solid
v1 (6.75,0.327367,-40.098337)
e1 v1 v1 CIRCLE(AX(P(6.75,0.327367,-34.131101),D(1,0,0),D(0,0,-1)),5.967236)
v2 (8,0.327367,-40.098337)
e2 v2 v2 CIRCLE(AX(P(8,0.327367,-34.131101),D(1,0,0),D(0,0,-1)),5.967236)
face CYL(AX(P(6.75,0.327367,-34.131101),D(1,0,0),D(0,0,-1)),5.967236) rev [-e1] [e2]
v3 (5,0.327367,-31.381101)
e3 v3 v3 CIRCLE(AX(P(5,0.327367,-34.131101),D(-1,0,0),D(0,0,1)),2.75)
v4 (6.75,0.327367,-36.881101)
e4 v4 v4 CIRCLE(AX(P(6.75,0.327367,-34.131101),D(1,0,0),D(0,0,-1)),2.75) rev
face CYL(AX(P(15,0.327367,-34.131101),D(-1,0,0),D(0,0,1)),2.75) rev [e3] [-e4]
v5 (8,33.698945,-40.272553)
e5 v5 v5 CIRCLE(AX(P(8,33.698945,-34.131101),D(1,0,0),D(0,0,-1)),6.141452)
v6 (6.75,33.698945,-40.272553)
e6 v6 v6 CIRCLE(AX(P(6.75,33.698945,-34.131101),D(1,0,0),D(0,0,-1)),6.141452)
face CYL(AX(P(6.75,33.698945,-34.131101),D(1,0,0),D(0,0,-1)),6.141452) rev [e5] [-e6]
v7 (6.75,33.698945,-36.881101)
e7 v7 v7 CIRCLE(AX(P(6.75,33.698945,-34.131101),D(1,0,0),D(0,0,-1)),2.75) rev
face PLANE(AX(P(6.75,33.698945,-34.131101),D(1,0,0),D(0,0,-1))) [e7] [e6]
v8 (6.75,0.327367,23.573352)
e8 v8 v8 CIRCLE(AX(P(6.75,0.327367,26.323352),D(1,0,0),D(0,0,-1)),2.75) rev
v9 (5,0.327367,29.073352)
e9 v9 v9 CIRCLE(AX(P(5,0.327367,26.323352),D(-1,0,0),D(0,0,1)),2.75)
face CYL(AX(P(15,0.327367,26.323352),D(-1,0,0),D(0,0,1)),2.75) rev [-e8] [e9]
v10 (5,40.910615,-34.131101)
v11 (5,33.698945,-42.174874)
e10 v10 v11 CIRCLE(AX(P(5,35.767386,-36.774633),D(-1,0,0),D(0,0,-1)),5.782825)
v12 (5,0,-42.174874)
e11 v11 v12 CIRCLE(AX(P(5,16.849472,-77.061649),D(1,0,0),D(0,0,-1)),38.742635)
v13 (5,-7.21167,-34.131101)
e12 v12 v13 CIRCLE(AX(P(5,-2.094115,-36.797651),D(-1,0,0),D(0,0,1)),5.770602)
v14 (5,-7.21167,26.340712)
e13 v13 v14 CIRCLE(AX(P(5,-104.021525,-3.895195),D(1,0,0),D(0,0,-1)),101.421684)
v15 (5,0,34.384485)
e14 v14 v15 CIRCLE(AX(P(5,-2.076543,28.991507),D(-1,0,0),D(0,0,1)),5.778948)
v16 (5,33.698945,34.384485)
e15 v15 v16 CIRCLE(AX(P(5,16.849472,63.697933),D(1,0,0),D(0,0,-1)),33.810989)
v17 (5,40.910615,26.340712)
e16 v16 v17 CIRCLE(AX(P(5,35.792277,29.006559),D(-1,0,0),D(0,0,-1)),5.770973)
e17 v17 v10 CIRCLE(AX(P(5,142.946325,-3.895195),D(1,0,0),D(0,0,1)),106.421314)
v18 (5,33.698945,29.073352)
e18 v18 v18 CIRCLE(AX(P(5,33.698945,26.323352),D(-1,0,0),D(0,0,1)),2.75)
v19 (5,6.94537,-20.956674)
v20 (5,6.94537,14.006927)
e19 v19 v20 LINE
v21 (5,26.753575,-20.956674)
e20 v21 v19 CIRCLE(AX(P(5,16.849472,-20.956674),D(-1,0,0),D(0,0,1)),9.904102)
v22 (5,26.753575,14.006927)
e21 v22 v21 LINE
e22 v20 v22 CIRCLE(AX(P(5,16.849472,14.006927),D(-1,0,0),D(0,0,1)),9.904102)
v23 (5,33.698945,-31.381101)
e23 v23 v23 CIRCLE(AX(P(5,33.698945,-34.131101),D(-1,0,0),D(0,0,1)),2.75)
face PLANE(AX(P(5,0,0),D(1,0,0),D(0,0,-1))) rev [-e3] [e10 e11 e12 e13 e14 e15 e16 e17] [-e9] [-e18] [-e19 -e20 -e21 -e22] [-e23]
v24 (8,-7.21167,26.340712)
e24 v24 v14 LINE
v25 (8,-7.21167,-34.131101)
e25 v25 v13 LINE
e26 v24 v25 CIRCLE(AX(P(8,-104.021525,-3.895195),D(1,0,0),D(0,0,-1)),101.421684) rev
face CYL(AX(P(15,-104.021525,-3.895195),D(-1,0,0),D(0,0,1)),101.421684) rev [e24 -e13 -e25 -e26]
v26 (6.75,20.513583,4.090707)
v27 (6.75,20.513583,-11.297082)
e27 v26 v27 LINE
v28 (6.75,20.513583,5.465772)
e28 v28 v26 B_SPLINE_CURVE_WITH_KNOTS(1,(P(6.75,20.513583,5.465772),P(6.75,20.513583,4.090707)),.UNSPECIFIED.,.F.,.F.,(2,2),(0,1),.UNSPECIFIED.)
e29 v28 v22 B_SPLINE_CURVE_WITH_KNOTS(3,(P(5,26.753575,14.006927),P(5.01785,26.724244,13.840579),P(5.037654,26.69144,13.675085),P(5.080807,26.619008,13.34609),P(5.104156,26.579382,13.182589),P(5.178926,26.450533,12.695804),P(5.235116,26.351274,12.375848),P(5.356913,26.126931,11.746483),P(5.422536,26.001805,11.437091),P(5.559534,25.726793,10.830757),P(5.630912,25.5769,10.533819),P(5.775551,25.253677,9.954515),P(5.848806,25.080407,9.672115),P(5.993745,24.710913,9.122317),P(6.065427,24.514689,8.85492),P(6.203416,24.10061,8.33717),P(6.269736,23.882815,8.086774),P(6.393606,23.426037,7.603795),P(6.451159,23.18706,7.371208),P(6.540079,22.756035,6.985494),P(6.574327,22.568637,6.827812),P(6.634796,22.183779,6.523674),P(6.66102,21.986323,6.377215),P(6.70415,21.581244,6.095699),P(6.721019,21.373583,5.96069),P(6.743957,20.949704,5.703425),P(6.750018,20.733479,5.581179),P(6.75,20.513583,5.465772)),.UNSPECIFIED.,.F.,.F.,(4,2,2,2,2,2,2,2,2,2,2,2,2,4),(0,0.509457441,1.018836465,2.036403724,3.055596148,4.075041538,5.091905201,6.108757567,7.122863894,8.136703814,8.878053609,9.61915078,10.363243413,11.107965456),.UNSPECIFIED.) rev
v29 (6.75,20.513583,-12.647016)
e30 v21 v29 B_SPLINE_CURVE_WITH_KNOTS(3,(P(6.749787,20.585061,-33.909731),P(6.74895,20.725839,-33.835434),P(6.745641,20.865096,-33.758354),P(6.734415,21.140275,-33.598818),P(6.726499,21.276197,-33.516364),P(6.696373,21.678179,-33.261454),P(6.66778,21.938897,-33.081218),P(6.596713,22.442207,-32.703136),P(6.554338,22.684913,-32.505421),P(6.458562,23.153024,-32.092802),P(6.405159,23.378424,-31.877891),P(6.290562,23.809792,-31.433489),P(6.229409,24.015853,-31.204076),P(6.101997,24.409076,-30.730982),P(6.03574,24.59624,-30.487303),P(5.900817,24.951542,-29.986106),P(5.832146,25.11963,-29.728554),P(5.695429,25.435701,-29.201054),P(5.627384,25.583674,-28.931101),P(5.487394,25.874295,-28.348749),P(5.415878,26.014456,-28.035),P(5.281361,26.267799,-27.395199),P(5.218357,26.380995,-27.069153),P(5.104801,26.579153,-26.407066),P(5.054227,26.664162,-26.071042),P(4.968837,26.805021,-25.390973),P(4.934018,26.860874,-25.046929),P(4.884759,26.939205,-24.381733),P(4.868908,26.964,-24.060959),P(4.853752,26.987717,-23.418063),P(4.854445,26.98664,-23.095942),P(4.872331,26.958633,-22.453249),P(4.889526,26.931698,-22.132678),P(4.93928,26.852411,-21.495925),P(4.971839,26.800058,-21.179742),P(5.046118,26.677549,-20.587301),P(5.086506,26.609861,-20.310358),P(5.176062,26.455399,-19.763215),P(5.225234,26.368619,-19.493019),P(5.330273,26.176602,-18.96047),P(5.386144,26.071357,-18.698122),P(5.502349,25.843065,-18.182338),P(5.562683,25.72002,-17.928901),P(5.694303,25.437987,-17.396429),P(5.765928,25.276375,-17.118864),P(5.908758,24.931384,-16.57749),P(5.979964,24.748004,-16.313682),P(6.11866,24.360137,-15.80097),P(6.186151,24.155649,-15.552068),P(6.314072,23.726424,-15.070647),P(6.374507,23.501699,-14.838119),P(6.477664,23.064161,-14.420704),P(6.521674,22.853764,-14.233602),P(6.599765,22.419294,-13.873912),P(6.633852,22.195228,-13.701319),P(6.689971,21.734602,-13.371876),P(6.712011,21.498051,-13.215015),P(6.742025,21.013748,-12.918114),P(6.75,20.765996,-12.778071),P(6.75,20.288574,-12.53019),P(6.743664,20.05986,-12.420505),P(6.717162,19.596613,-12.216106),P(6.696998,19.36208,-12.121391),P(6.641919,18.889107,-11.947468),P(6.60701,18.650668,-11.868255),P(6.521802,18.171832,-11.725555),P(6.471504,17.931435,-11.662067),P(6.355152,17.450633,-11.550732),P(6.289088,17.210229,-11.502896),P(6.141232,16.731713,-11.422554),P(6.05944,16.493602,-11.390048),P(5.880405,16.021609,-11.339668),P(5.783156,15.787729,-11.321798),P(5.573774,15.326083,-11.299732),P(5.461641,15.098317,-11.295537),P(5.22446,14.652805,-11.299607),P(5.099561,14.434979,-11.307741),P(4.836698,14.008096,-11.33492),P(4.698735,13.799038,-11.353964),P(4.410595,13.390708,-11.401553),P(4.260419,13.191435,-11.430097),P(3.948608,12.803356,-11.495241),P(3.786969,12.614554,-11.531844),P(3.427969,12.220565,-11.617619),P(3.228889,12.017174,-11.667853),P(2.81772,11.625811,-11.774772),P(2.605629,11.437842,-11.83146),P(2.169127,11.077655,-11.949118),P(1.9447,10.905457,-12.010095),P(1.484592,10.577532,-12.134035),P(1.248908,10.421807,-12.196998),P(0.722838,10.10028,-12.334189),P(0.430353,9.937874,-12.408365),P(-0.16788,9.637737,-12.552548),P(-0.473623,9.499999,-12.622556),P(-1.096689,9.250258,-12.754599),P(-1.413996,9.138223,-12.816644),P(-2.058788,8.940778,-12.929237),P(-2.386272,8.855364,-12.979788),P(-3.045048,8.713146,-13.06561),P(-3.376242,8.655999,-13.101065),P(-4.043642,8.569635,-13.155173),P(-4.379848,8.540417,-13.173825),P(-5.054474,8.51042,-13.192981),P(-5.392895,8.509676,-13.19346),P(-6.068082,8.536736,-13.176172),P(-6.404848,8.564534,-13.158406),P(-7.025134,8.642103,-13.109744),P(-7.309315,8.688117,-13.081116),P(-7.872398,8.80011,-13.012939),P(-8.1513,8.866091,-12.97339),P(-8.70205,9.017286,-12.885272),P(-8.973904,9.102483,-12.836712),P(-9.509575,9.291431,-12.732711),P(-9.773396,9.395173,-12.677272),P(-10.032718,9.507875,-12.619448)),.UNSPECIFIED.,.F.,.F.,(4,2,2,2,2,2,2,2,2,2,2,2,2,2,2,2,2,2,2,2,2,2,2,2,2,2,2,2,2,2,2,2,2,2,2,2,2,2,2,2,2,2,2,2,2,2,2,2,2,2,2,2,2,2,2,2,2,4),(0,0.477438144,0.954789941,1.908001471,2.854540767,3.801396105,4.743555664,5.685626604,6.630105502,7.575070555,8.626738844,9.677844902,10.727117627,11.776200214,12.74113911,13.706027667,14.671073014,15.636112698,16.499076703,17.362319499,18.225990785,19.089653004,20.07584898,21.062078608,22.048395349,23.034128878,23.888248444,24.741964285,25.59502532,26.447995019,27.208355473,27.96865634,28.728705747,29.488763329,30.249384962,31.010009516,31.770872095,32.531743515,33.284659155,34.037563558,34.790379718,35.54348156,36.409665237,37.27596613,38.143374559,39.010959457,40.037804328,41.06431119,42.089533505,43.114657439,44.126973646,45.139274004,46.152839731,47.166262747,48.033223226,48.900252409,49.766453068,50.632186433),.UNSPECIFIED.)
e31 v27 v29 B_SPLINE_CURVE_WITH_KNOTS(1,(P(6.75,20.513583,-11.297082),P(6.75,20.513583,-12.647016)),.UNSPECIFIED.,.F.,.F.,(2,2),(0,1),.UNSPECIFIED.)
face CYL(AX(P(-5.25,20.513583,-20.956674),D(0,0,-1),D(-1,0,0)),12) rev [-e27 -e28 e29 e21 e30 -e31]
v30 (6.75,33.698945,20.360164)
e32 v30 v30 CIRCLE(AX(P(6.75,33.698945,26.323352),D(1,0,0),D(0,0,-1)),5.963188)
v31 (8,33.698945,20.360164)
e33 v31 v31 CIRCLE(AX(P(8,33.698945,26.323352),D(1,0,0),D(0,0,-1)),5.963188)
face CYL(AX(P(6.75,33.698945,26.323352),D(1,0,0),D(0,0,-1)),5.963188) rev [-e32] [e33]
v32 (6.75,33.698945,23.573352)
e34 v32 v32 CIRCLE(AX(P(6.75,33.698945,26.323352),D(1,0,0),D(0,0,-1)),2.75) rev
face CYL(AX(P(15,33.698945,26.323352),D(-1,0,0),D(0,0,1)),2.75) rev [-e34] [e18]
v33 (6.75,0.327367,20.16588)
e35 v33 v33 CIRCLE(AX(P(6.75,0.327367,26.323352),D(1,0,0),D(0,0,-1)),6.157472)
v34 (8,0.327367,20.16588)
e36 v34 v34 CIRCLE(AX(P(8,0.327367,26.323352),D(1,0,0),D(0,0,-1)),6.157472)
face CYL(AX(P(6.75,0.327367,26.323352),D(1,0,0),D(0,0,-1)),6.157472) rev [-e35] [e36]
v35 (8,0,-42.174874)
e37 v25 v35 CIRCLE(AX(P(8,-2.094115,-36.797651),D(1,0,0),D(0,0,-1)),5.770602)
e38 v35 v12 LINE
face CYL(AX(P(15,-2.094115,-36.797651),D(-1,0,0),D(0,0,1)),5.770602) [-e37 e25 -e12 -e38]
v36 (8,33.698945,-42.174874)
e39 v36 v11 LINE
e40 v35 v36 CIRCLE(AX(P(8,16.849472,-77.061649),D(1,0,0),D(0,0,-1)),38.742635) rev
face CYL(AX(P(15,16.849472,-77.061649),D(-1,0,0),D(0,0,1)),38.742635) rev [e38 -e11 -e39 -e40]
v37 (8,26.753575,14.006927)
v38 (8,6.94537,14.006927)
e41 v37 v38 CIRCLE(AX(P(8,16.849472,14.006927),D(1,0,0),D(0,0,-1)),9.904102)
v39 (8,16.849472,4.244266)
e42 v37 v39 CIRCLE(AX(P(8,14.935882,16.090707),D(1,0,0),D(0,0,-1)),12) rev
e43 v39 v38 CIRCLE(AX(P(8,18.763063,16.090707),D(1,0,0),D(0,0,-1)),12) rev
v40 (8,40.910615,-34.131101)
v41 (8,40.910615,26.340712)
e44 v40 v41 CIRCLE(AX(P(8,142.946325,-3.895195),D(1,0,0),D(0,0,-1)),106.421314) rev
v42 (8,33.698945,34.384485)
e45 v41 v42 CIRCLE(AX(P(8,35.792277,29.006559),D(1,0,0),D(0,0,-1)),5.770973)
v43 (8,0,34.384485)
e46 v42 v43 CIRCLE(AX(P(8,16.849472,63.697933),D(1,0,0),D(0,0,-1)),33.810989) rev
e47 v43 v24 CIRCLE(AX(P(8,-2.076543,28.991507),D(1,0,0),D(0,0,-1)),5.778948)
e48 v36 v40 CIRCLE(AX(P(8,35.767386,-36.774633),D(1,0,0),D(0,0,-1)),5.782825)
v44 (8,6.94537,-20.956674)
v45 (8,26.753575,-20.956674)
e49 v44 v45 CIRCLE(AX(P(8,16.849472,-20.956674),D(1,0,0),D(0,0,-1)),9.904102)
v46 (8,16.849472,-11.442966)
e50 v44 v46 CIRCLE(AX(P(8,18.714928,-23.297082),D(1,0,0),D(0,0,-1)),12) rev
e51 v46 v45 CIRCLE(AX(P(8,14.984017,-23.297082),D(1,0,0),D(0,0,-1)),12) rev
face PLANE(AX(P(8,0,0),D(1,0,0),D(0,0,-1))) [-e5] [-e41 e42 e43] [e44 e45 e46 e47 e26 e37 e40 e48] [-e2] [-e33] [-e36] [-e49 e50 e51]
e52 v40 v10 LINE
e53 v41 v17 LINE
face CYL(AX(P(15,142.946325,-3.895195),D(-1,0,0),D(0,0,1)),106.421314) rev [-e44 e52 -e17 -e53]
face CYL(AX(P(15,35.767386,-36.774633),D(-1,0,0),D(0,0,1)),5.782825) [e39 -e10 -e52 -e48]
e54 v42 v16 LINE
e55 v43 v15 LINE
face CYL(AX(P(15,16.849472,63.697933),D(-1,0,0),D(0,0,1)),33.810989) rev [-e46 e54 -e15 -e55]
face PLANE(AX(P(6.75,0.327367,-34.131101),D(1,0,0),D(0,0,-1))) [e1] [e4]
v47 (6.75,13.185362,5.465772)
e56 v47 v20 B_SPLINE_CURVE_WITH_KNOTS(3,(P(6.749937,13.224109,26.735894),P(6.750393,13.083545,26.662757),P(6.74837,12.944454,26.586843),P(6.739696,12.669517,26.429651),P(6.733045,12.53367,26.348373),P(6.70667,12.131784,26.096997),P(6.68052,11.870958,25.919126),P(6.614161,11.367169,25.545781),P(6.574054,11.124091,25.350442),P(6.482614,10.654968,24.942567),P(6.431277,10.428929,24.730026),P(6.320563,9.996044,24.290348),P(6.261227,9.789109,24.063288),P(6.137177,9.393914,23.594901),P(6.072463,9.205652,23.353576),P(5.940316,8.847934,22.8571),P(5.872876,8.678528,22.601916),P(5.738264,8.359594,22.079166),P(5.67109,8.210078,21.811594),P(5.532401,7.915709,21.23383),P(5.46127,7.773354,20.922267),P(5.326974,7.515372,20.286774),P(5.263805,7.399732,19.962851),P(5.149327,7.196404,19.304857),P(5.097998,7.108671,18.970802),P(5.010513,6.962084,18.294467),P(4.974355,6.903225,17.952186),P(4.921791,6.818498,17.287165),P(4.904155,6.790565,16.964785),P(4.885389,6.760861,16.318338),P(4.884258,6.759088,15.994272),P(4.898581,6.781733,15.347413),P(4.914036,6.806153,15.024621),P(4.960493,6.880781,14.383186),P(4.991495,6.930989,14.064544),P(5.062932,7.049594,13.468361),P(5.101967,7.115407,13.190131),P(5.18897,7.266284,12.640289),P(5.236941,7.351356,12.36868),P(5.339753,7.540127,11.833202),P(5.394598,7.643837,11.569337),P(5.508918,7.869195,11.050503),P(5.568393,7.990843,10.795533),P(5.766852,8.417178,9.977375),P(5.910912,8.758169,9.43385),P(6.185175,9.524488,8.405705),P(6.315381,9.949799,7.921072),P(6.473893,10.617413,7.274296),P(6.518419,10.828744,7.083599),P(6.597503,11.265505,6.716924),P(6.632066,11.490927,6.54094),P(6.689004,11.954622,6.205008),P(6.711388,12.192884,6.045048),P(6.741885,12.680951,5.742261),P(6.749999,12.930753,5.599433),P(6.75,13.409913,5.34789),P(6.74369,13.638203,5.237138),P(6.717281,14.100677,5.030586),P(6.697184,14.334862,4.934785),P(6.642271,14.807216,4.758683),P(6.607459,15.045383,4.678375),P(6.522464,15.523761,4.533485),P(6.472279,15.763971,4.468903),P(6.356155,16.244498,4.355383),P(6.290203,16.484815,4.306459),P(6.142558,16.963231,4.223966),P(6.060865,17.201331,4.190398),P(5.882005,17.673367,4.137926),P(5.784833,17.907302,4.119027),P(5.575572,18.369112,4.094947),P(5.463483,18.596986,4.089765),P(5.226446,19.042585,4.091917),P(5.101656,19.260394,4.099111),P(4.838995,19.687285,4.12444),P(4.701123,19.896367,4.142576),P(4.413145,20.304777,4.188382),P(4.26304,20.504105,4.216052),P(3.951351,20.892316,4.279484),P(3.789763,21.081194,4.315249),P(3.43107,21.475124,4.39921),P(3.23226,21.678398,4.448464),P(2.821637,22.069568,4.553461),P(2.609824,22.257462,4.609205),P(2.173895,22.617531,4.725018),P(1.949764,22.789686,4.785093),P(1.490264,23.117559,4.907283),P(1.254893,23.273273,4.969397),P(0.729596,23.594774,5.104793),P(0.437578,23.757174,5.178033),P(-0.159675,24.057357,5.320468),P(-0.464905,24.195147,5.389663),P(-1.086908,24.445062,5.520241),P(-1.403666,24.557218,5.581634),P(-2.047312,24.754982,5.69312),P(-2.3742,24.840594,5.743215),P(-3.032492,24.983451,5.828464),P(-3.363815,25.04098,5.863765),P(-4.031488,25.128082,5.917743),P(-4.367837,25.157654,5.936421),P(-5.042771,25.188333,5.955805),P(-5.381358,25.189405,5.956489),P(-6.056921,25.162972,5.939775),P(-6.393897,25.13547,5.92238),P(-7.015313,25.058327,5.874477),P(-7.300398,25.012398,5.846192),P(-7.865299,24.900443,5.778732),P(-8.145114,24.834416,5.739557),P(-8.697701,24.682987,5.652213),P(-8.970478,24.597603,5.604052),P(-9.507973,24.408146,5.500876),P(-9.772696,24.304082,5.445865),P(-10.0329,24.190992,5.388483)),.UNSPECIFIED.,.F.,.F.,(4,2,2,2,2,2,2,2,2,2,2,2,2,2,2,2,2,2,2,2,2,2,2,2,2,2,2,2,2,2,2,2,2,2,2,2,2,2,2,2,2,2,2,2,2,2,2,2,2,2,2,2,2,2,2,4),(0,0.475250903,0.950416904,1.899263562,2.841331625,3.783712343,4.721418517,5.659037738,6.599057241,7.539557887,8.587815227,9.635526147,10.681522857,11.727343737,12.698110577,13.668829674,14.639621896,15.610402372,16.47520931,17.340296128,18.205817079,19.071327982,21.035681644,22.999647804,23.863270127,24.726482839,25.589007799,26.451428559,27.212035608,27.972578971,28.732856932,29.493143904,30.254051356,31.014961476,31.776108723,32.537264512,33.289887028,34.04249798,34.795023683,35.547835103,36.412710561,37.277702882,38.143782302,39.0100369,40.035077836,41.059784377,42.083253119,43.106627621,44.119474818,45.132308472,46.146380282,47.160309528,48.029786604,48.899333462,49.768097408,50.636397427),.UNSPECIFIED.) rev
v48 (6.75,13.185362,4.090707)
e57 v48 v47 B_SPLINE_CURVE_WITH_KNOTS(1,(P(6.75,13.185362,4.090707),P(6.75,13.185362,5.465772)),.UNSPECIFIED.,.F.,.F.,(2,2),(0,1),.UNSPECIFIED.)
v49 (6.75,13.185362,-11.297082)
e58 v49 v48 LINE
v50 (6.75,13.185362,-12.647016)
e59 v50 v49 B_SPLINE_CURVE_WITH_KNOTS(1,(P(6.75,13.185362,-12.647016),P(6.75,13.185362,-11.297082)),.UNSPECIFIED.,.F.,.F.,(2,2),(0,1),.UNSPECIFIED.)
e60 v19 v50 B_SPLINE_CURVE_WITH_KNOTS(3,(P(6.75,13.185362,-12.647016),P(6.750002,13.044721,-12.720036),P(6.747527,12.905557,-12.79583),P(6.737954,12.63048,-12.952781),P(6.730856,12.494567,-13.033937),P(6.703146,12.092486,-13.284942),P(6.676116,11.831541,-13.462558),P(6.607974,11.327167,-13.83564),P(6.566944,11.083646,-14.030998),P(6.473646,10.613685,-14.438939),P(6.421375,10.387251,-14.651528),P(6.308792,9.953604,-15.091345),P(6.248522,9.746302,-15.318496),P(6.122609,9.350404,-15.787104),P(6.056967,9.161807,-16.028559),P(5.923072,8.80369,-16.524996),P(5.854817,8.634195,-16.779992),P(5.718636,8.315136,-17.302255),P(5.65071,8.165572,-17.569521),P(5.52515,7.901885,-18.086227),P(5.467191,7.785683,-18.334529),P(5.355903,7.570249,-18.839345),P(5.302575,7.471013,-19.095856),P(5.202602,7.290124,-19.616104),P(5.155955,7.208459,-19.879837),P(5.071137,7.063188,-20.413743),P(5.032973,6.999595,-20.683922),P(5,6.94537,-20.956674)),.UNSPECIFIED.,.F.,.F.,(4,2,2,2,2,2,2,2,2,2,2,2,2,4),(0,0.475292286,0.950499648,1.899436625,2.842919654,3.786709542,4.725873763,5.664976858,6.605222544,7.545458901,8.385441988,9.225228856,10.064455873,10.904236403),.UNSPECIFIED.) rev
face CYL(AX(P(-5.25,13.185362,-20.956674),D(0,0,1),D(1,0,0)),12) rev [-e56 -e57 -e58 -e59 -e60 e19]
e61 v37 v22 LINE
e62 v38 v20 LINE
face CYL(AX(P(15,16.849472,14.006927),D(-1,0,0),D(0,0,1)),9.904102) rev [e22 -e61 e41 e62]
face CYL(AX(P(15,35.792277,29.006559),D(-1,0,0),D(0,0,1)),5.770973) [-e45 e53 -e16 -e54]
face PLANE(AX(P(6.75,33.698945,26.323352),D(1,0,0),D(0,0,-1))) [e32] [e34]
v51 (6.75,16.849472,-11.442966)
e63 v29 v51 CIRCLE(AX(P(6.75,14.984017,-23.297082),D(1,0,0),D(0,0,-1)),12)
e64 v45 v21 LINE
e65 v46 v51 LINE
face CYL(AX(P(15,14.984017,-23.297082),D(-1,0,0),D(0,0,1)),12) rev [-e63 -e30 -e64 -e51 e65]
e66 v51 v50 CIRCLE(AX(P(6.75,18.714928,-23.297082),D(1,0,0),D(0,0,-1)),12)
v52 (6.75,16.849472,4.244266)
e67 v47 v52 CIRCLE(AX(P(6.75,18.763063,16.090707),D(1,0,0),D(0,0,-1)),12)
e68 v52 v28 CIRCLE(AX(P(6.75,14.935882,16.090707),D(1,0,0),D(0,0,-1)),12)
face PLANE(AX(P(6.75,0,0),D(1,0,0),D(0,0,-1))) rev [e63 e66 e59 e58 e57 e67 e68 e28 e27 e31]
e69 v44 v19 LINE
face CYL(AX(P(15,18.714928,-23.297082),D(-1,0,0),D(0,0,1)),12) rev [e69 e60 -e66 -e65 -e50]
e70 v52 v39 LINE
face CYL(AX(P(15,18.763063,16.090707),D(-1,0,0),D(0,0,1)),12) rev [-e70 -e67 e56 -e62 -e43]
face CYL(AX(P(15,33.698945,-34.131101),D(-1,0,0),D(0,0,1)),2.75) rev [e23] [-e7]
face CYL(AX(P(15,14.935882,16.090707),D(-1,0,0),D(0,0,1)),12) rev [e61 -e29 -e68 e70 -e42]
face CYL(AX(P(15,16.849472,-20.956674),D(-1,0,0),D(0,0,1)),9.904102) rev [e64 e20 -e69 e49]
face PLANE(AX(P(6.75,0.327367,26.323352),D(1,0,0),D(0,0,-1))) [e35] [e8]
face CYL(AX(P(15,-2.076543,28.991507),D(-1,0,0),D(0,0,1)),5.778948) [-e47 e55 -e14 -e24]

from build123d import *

# Parameters (mm, degrees)
SKETCH_1_W          = 87
SKETCH_1_H          = 63
SKETCH_1_W_2        = 83
SKETCH_1_H_2        = 59
EXTRUDE_1_DEPTH     = 5
SKETCH_2_W          = 87
SKETCH_2_H          = 63
EXTRUDE_2_DEPTH     = 3
SKETCH_3_W          = 2.764626384
SKETCH_3_H          = 4.6515936
CUT_EXTRUDE_1_DEPTH = 2
FILLET_1_R          = 2
SKETCH_5_R          = 2.75
CUT_EXTRUDE_2_DEPTH = 10
SKETCH_6_OUTSIDE_W  = 110.542
SKETCH_6_OUTSIDE_H  = 86.542
CUT_EXTRUDE_3_DEPTH = 10
SKETCH_7_W          = 10.763963746
SKETCH_7_H          = 73.165580881
CUT_EXTRUDE_4_DEPTH = 125
SKETCH_8_R          = 5.963187944
SKETCH_8_R_2        = 6.141451549
SKETCH_8_R_3        = 6.157472201
SKETCH_8_R_4        = 5.967235868
CUT_EXTRUDE_5_DEPTH = 1.25
SKETCH_9_W          = 15.387789175
SKETCH_9_H          = 31.944271198
EXTRUDE_4_DEPTH     = 1.25
FILLET_2_R          = 12


with BuildPart() as part:
    # 草图1 → 凸台-拉伸1 (new body)
    with BuildSketch(Plane(origin=(0, 0, 0), x_dir=(0, 0, -1), z_dir=(1, 0, 0))):
        with Locations((3.90387463, 17.013155975)):
            Rectangle(SKETCH_1_W, SKETCH_1_H)
        with Locations((3.90387463, 17.013155975)):
            Rectangle(SKETCH_1_W_2, SKETCH_1_H_2, mode=Mode.SUBTRACT)
    extrude(amount=EXTRUDE_1_DEPTH)

    # 草图2 → 凸台-拉伸2 (add)
    with BuildSketch(Plane(origin=(5, 0, 0), x_dir=(0, 0, -1), z_dir=(1, 0, 0))):
        with Locations((3.90387463, 17.013155975)):
            Rectangle(SKETCH_2_W, SKETCH_2_H)
    extrude(amount=EXTRUDE_2_DEPTH)

    # 草图3 → 切除-拉伸1 (cut)
    with BuildSketch(Plane(origin=(0, 0, -47.40387463), x_dir=(-1, 0, 0), z_dir=(0, 0, -1))):
        with Locations((-3.662779601, -6.806448474)):
            Rectangle(SKETCH_3_W, SKETCH_3_H)
    extrude(amount=-CUT_EXTRUDE_1_DEPTH, mode=Mode.SUBTRACT)

    # 圆角1
    fillet_1_edges = [part.edges().sort_by_distance(p)[0] for p in [
        (8, 17.013155975, 39.59612537),
        (8, -14.486844025, -3.90387463),
        (8, 17.013155975, -47.40387463),
        (8, 48.513155975, -3.90387463),
        (4, 48.513155975, 39.59612537),
        (4, 48.513155975, -47.40387463),
        (4, -14.486844025, -47.40387463),
        (4, -14.486844025, 39.59612537),
    ]]
    fillet(fillet_1_edges, radius=FILLET_1_R)

    # 草图5 → 切除-拉伸2 (cut)
    with BuildSketch(Plane.ZY.offset(-5)):
        with Locations((-34.13110136, 33.698944985)):
            Circle(SKETCH_5_R)
        with Locations((26.3233521, 33.698944985)):
            Circle(SKETCH_5_R)
        with Locations((-34.13110136, 0.327366965)):
            Circle(SKETCH_5_R)
        with Locations((26.3233521, 0.327366965)):
            Circle(SKETCH_5_R)
    extrude(amount=-CUT_EXTRUDE_2_DEPTH, mode=Mode.SUBTRACT)

    # 草图6 outside → 切除-拉伸3 (cut)
    # profile 1 of 2: a face of its own
    with BuildSketch(Plane.ZY.offset(-5)):
        with Locations((-3.904, 17.013)):
            Rectangle(SKETCH_6_OUTSIDE_W, SKETCH_6_OUTSIDE_H)
        with BuildLine():
            ThreePointArc((-42.174874453, 33.698944985), (-38.319014018, 16.849472493), (-42.174874453, 0))
            ThreePointArc((-42.174874453, 0), (-40.649791206, -6.390726624), (-34.13110136, -7.211670209))
            ThreePointArc((-34.13110136, -7.211670209), (-3.895194581, -2.599840712), (26.340712199, -7.211670209))
            ThreePointArc((26.340712199, -7.211670209), (32.84921876, -6.379368362), (34.384485291, 0))
            ThreePointArc((34.384485291, 0), (29.88694456, 16.849472493), (34.384485291, 33.698944985))
            ThreePointArc((34.384485291, 33.698944985), (32.858946784, 40.089163818), (26.340712199, 40.910615194))
            ThreePointArc((26.340712199, 40.910615194), (-3.895194581, 36.525010702), (-34.13110136, 40.910615194))
            ThreePointArc((-34.13110136, 40.910615194), (-40.634931957, 40.073097857), (-42.174874453, 33.698944985))
        make_face(mode=Mode.SUBTRACT)
    # profile 2 of 2: a face of its own
    with BuildSketch(Plane.ZY.offset(-5)):
        with BuildLine():
            Line((-20.956673586, 26.753574551), (14.00692679, 26.753574551))
            ThreePointArc((14.00692679, 26.753574551), (23.911028849, 16.849472493), (14.00692679, 6.945370434))
            Line((14.00692679, 6.945370434), (-20.956673586, 6.945370434))
            ThreePointArc((-20.956673586, 6.945370434), (-30.860775645, 16.849472493), (-20.956673586, 26.753574551))
        make_face()
    extrude(amount=-CUT_EXTRUDE_3_DEPTH, mode=Mode.SUBTRACT)


with BuildPart() as cut_extrude_3_piece_1:
    # of the separate pieces the step leaves, piece 1, a body of its own (cut_extrude_3_pieces)
    add(part.part.solids().sort_by_distance((5, 33.698944985, 34.384485291))[0])

    # 草图8 → 切除-拉伸5 (cut)
    with BuildSketch(Plane(origin=(8, 0, 0), x_dir=(0, 0, -1), z_dir=(1, 0, 0))):
        with Locations((-26.3233521, 33.698944985)):
            Circle(SKETCH_8_R)
        with Locations((34.13110136, 33.698944985)):
            Circle(SKETCH_8_R_2)
        with Locations((-26.3233521, 0.327366965)):
            Circle(SKETCH_8_R_3)
        with Locations((34.13110136, 0.327366965)):
            Circle(SKETCH_8_R_4)
    extrude(amount=-CUT_EXTRUDE_5_DEPTH, mode=Mode.SUBTRACT)

    # 草图9 → 凸台-拉伸4 (add)
    with BuildSketch(Plane(origin=(8, 0, 0), x_dir=(0, 0, -1), z_dir=(1, 0, 0))):
        with Locations((3.60318744, 17.051189704)):
            Rectangle(SKETCH_9_W, SKETCH_9_H)
    extrude(amount=-EXTRUDE_4_DEPTH)

    # 圆角2
    # the kernel refuses this fillet: 12 mm, written as the material it adds along each edge
    with BuildSketch(Plane(origin=(6.75, 26.753574551, 4.090707148), x_dir=(-1, 0, 0), z_dir=(0, 0, -1)), Plane(origin=(6.75, 6.945370434, -11.297082027), x_dir=(-1, 0, 0), z_dir=(0, 0, 1))) as fillet_2_piece_1:
        with BuildLine():
            CenterArc((12, -6.239991987), FILLET_2_R, 148.667793293, 31.332206707)
            Line((0, -6.239991987), (-0.24, -6.239991987))
            Line((-0.24, -6.239991987), (-0.24, 0))
            Line((-0.24, 0), (0, 0.24))
            ThreePointArc((0, 0.24), (0.875, 0.24), (1.545, 0.12479984))
            Line((1.545, 0.12479984), (1.75, 0))
        make_face()
    extrude(amount=15.387789175)
    with BuildSketch(Plane(origin=(6.75, 6.945370434, -11.297082027), x_dir=(0, 0, -1), z_dir=(1, 0, 0)), Plane(origin=(8, 26.753574551, -11.297082027), x_dir=(0, 0, -1), z_dir=(-1, 0, 0))) as fillet_2_piece_2:
        with BuildLine():
            CenterArc((12, 11.769557695), FILLET_2_R, 180, 78.753288074)
            Line((0, 11.769557695), (-0.24, 11.769557695))
            Line((-0.24, 11.769557695), (-0.24, 0))
            Line((-0.24, 0), (0, -0.24))
            ThreePointArc((0, -0.24), (4.82979578, -0.24), (9.612783391, -0.235391154))
            Line((9.612783391, -0.235391154), (9.65959156, 0))
        make_face()
    extrude(amount=1.25)
    with BuildSketch(Plane(origin=(8, 6.945370434, 4.090707148), x_dir=(0, 0, 1), z_dir=(-1, 0, 0)), Plane(origin=(6.75, 26.753574551, 4.090707148), x_dir=(0, 0, 1), z_dir=(1, 0, 0))) as fillet_2_piece_3:
        with BuildLine():
            CenterArc((12, 11.817692644), FILLET_2_R, 180, 79.999989207)
            Line((0, 11.817692644), (-0.24, 11.817692644))
            Line((-0.24, 11.817692644), (-0.24, 0))
            Line((-0.24, 0), (0, -0.24))
            ThreePointArc((0, -0.24), (4.958109821, -0.24), (9.874544035, -0.236353853))
            Line((9.874544035, -0.236353853), (9.916219642, 0))
        make_face()
    extrude(amount=1.25)
    with BuildSketch(Plane(origin=(-22.794231609, 26.753574551, 4.090707148), x_dir=(0, 0, 1), z_dir=(1, 0, 0))) as fillet_2_piece_4a_section:
        with BuildLine():
            CenterArc((12, 11.817692644), FILLET_2_R, 180, 79.999989207)
            Line((0, 11.817692644), (-0.24, 11.817692644))
            Line((-0.24, 11.817692644), (-0.24, 0))
            Line((-0.24, 0), (0, -0.24))
            ThreePointArc((0, -0.24), (4.958109821, -0.24), (9.874544035, -0.236353853))
            Line((9.874544035, -0.236353853), (9.916219642, 0))
        make_face()
    fillet_2_piece_4a = extrude(amount=30.794231609, mode=Mode.PRIVATE)
    fillet_2_piece_4a = split(fillet_2_piece_4a, bisect_by=Plane(origin=(5, 26.753574551, 4.090707148), z_dir=(1, 0, 0)), keep=Keep.TOP, mode=Mode.PRIVATE)
    fillet_2_piece_4a = split(fillet_2_piece_4a, bisect_by=Plane(origin=(6.75, 26.753574551, 4.090707148), z_dir=(-1, 0, 0)), keep=Keep.TOP, mode=Mode.PRIVATE)
    with BuildSketch(Plane(origin=(6.75, 26.753574551, 19.690687116), x_dir=(-1, 0, 0), z_dir=(0, 0, -1))) as fillet_2_piece_4b_section:
        with BuildLine():
            CenterArc((12, -6.239991987), FILLET_2_R, 148.667793293, 31.332206707)
            Line((0, -6.239991987), (-0.24, -6.239991987))
            Line((-0.24, -6.239991987), (-0.24, 0))
            Line((-0.24, 0), (0, 0.24))
            ThreePointArc((0, 0.24), (0.875, 0.24), (1.545, 0.12479984))
            Line((1.545, 0.12479984), (1.75, 0))
        make_face()
    fillet_2_piece_4b = extrude(amount=30.987769142, mode=Mode.PRIVATE)
    fillet_2_piece_4b = split(fillet_2_piece_4b, bisect_by=Plane(origin=(6.75, 26.753574551, 4.090707148), z_dir=(0, 0, 1)), keep=Keep.TOP, mode=Mode.PRIVATE)
    fillet_2_piece_4 = fillet_2_piece_4a & fillet_2_piece_4b
    add(fillet_2_piece_4)
    with BuildSketch(Plane(origin=(6.75, 26.753574551, 4.090707148), x_dir=(-1, 0, 0), z_dir=(0, 0, -1))) as fillet_2_piece_5a_section:
        with BuildLine():
            CenterArc((12, -6.239991987), FILLET_2_R, 148.667793293, 31.332206707)
            Line((0, -6.239991987), (-0.24, -6.239991987))
            Line((-0.24, -6.239991987), (-0.24, 0))
            Line((-0.24, 0), (0, 0.24))
            ThreePointArc((0, 0.24), (0.875, 0.24), (1.545, 0.12479984))
            Line((1.545, 0.12479984), (1.75, 0))
        make_face()
    fillet_2_piece_5a = extrude(amount=30.987769142, mode=Mode.PRIVATE)
    fillet_2_piece_5a = split(fillet_2_piece_5a, bisect_by=Plane(origin=(6.75, 26.753574551, -11.297082027), z_dir=(0, 0, -1)), keep=Keep.TOP, mode=Mode.PRIVATE)
    with BuildSketch(Plane(origin=(8, 26.753574551, -11.297082027), x_dir=(0, 0, -1), z_dir=(-1, 0, 0))) as fillet_2_piece_5b_section:
        with BuildLine():
            CenterArc((12, 11.769557695), FILLET_2_R, 180, 78.753288074)
            Line((0, 11.769557695), (-0.24, 11.769557695))
            Line((-0.24, 11.769557695), (-0.24, 0))
            Line((-0.24, 0), (0, -0.24))
            ThreePointArc((0, -0.24), (4.82979578, -0.24), (9.612783391, -0.235391154))
            Line((9.612783391, -0.235391154), (9.65959156, 0))
        make_face()
    fillet_2_piece_5b = extrude(amount=30.673894237, mode=Mode.PRIVATE)
    fillet_2_piece_5b = split(fillet_2_piece_5b, bisect_by=Plane(origin=(5, 26.753574551, -11.297082027), z_dir=(1, 0, 0)), keep=Keep.TOP, mode=Mode.PRIVATE)
    fillet_2_piece_5b = split(fillet_2_piece_5b, bisect_by=Plane(origin=(6.75, 26.753574551, -11.297082027), z_dir=(-1, 0, 0)), keep=Keep.TOP, mode=Mode.PRIVATE)
    fillet_2_piece_5 = fillet_2_piece_5a & fillet_2_piece_5b
    add(fillet_2_piece_5)
    with BuildSketch(Plane(origin=(-22.673894237, 6.945370434, -11.297082027), x_dir=(0, 0, -1), z_dir=(1, 0, 0))) as fillet_2_piece_6a_section:
        with BuildLine():
            CenterArc((12, 11.769557695), FILLET_2_R, 180, 78.753288074)
            Line((0, 11.769557695), (-0.24, 11.769557695))
            Line((-0.24, 11.769557695), (-0.24, 0))
            Line((-0.24, 0), (0, -0.24))
            ThreePointArc((0, -0.24), (4.82979578, -0.24), (9.612783391, -0.235391154))
            Line((9.612783391, -0.235391154), (9.65959156, 0))
        make_face()
    fillet_2_piece_6a = extrude(amount=30.673894237, mode=Mode.PRIVATE)
    fillet_2_piece_6a = split(fillet_2_piece_6a, bisect_by=Plane(origin=(5, 6.945370434, -11.297082027), z_dir=(1, 0, 0)), keep=Keep.TOP, mode=Mode.PRIVATE)
    fillet_2_piece_6a = split(fillet_2_piece_6a, bisect_by=Plane(origin=(6.75, 6.945370434, -11.297082027), z_dir=(-1, 0, 0)), keep=Keep.TOP, mode=Mode.PRIVATE)
    with BuildSketch(Plane(origin=(6.75, 6.945370434, -26.897061994), x_dir=(-1, 0, 0), z_dir=(0, 0, 1))) as fillet_2_piece_6b_section:
        with BuildLine():
            CenterArc((12, -6.239991987), FILLET_2_R, 148.667793293, 31.332206707)
            Line((0, -6.239991987), (-0.24, -6.239991987))
            Line((-0.24, -6.239991987), (-0.24, 0))
            Line((-0.24, 0), (0, 0.24))
            ThreePointArc((0, 0.24), (0.875, 0.24), (1.545, 0.12479984))
            Line((1.545, 0.12479984), (1.75, 0))
        make_face()
    fillet_2_piece_6b = extrude(amount=30.987769142, mode=Mode.PRIVATE)
    fillet_2_piece_6b = split(fillet_2_piece_6b, bisect_by=Plane(origin=(6.75, 6.945370434, -11.297082027), z_dir=(0, 0, -1)), keep=Keep.TOP, mode=Mode.PRIVATE)
    fillet_2_piece_6 = fillet_2_piece_6a & fillet_2_piece_6b
    add(fillet_2_piece_6)
    with BuildSketch(Plane(origin=(6.75, 6.945370434, -11.297082027), x_dir=(-1, 0, 0), z_dir=(0, 0, 1))) as fillet_2_piece_7a_section:
        with BuildLine():
            CenterArc((12, -6.239991987), FILLET_2_R, 148.667793293, 31.332206707)
            Line((0, -6.239991987), (-0.24, -6.239991987))
            Line((-0.24, -6.239991987), (-0.24, 0))
            Line((-0.24, 0), (0, 0.24))
            ThreePointArc((0, 0.24), (0.875, 0.24), (1.545, 0.12479984))
            Line((1.545, 0.12479984), (1.75, 0))
        make_face()
    fillet_2_piece_7a = extrude(amount=30.987769142, mode=Mode.PRIVATE)
    fillet_2_piece_7a = split(fillet_2_piece_7a, bisect_by=Plane(origin=(6.75, 6.945370434, 4.090707148), z_dir=(0, 0, 1)), keep=Keep.TOP, mode=Mode.PRIVATE)
    with BuildSketch(Plane(origin=(8, 6.945370434, 4.090707148), x_dir=(0, 0, 1), z_dir=(-1, 0, 0))) as fillet_2_piece_7b_section:
        with BuildLine():
            CenterArc((12, 11.817692644), FILLET_2_R, 180, 79.999989207)
            Line((0, 11.817692644), (-0.24, 11.817692644))
            Line((-0.24, 11.817692644), (-0.24, 0))
            Line((-0.24, 0), (0, -0.24))
            ThreePointArc((0, -0.24), (4.958109821, -0.24), (9.874544035, -0.236353853))
            Line((9.874544035, -0.236353853), (9.916219642, 0))
        make_face()
    fillet_2_piece_7b = extrude(amount=30.794231609, mode=Mode.PRIVATE)
    fillet_2_piece_7b = split(fillet_2_piece_7b, bisect_by=Plane(origin=(5, 6.945370434, 4.090707148), z_dir=(1, 0, 0)), keep=Keep.TOP, mode=Mode.PRIVATE)
    fillet_2_piece_7b = split(fillet_2_piece_7b, bisect_by=Plane(origin=(6.75, 6.945370434, 4.090707148), z_dir=(-1, 0, 0)), keep=Keep.TOP, mode=Mode.PRIVATE)
    fillet_2_piece_7 = fillet_2_piece_7a & fillet_2_piece_7b
    add(fillet_2_piece_7)


with BuildPart() as cut_extrude_3_piece_2:
    # of the separate pieces the step leaves, piece 2, a body of its own (cut_extrude_3_pieces)
    add(part.part.solids().sort_by_distance((0, 48.513155975, 37.59612537))[0])

    # 草图7 → 切除-拉伸4 (cut)
    with BuildSketch(Plane(origin=(0, 0, -47.40387463), x_dir=(-1, 0, 0), z_dir=(0, 0, -1))):
        with Locations((0.381981873, 14.788439085)):
            Rectangle(SKETCH_7_W, SKETCH_7_H)
    extrude(amount=-CUT_EXTRUDE_4_DEPTH, mode=Mode.SUBTRACT)


solid = cut_extrude_3_piece_1.part
